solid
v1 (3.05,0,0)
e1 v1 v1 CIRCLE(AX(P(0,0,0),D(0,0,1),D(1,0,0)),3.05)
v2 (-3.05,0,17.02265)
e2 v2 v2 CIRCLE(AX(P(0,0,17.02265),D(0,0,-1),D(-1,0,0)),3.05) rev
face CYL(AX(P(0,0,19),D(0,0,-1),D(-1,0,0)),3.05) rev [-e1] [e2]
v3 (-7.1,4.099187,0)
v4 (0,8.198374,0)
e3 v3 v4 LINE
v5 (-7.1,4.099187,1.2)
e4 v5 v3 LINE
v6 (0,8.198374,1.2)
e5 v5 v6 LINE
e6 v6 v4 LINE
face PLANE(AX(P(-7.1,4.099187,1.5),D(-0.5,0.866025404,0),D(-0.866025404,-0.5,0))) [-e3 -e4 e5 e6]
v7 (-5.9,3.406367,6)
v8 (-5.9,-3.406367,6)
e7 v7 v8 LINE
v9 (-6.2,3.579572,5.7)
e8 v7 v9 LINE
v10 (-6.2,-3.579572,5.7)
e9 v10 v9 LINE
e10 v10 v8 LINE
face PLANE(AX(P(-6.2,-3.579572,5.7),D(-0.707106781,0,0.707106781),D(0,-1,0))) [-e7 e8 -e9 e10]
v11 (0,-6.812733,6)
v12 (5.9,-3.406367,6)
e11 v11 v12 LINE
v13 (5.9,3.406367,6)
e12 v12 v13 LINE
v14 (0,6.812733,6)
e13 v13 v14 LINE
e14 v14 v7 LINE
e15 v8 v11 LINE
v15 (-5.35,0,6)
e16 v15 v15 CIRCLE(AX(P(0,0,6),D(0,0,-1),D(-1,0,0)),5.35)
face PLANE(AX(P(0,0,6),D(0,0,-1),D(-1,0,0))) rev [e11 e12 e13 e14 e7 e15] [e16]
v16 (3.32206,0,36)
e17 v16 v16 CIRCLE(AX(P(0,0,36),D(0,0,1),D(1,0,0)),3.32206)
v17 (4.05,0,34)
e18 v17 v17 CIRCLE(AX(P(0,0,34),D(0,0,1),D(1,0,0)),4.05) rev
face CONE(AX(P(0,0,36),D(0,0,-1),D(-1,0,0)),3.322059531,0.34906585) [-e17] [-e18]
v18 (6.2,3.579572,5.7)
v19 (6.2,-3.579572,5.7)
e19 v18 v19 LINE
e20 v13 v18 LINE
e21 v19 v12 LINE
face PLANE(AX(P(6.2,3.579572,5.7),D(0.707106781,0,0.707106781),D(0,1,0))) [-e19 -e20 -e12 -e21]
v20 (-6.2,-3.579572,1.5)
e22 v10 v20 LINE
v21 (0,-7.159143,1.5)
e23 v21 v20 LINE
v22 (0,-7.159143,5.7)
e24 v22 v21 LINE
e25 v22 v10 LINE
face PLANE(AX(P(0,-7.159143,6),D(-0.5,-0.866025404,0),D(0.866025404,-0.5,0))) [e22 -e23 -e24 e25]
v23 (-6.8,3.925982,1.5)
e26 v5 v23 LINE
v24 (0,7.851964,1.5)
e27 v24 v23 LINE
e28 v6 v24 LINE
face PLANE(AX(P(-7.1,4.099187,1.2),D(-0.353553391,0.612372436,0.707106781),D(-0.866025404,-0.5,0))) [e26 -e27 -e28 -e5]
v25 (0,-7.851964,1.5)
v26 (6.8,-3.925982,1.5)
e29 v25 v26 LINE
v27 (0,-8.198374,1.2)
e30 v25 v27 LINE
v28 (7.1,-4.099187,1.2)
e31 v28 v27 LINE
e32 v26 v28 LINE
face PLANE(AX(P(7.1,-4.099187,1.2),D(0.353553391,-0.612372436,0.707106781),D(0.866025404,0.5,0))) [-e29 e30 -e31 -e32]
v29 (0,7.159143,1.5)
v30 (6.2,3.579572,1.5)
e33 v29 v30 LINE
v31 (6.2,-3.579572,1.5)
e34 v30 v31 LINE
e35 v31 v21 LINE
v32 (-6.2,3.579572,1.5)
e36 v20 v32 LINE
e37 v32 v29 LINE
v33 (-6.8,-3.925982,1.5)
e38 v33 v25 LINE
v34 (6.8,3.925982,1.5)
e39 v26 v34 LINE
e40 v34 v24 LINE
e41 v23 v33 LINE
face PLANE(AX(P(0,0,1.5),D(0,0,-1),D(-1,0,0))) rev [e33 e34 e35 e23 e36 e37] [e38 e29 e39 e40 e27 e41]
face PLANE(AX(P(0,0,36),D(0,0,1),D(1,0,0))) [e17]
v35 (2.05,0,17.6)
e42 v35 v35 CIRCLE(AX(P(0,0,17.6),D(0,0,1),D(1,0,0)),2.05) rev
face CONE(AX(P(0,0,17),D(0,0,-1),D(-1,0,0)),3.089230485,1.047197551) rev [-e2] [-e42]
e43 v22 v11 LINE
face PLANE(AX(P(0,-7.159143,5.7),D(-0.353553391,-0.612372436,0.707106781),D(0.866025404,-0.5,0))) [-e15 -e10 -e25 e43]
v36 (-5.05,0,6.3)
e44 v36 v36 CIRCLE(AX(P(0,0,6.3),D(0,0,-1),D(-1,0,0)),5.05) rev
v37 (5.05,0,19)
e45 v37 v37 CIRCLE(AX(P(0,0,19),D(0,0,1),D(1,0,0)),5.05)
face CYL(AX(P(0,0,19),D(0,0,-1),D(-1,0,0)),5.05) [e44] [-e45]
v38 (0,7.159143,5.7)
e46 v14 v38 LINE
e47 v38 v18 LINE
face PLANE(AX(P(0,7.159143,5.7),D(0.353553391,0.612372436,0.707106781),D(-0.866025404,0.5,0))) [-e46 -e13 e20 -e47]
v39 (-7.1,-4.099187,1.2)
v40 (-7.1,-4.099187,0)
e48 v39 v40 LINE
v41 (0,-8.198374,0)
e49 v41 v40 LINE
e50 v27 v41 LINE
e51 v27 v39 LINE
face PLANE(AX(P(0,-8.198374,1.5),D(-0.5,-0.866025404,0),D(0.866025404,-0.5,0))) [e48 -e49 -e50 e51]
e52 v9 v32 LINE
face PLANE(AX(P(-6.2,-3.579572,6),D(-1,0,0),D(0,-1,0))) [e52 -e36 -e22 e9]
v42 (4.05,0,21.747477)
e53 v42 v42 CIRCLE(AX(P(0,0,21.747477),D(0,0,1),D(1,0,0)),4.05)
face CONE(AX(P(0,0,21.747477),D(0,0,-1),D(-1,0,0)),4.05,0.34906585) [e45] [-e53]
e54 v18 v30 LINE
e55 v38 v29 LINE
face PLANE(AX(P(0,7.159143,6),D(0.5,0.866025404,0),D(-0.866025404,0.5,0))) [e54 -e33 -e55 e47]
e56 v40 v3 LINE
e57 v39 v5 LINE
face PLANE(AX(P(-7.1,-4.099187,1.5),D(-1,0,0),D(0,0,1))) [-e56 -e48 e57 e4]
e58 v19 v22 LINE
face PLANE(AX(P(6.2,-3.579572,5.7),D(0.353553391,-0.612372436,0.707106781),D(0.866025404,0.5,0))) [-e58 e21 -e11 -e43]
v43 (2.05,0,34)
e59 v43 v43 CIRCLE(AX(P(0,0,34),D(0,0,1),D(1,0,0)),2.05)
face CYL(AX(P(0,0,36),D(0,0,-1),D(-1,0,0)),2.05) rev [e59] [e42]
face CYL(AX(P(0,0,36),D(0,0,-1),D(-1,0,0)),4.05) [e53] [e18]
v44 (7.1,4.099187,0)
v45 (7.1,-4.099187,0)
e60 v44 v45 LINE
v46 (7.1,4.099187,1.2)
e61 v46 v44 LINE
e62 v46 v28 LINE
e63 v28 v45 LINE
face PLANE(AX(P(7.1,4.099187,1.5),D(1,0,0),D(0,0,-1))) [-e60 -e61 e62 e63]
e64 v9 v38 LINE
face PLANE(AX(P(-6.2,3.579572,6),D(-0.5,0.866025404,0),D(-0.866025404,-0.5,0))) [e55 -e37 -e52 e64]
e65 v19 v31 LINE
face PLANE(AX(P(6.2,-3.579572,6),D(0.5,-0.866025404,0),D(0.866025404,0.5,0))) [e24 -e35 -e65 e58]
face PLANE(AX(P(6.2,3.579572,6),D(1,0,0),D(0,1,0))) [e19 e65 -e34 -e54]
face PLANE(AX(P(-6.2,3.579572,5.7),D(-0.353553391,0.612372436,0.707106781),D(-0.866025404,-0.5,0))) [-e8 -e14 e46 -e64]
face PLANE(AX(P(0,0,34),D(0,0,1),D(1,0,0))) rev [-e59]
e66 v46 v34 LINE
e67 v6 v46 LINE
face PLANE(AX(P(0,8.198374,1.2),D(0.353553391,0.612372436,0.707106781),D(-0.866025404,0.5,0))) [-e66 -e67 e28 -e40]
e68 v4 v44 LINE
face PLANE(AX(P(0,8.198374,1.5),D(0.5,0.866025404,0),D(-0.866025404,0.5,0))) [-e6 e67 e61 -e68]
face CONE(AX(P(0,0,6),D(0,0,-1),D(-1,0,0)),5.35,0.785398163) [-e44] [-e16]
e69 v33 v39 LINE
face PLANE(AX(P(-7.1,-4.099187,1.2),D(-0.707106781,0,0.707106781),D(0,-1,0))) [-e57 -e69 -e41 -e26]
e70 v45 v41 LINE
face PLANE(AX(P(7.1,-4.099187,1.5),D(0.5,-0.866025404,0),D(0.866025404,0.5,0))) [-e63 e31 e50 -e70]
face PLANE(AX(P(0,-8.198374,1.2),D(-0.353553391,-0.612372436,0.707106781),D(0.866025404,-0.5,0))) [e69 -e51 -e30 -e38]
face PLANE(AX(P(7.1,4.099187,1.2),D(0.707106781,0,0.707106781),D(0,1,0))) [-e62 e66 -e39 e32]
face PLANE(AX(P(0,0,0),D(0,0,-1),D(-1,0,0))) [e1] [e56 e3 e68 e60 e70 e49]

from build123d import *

# Parameters (mm, degrees)
BOSS_EXTRUDE1_DEPTH = 1.5
SKETCH1_8_R         = 4.05
BOSS_EXTRUDE3_DEPTH = 36
SKETCH1_9_R         = 5.05
BOSS_EXTRUDE4_DEPTH = 19
SHELL1_START        = 2
SHELL1_OUTLINE_R    = 3.05
SHELL1_DEPTH        = 15
SHELL1_START_2      = 17
SHELL1_2_OUTLINE_R  = 2.05
SHELL1_2_DEPTH      = 17
SKETCH1_10_R        = 3.05
CUT_EXTRUDE1_DEPTH  = 11
SKETCH1_3_R         = 3.05
BOSS_EXTRUDE2_DEPTH = 6
CHAMFER1_SIZE       = 2
CHAMFER1_SIZE2      = 0.727940469
CHAMFER2_SIZE       = 2.747477419
CHAMFER2_SIZE_2     = 1
CHAMFER3_SIZE       = 1.039230485
CHAMFER3_SIZE_2     = 0.6
CHAMFER5_SIZE       = 0.3


# Read off the part's stored shape, not the designer's step: Shell1
with BuildPart() as part:
    # Sketch1 → Boss-Extrude1 (new body)
    with BuildSketch(Plane.XY):
        Polygon((-7.1, 4.099186911), (0, 8.198373822), (7.1, 4.099186911), (7.1, -4.099186911), (0, -8.198373822), (-7.1, -4.099186911), align=None)
    extrude(amount=BOSS_EXTRUDE1_DEPTH)

    # Sketch1<8> → Boss-Extrude3 (add)
    with BuildSketch(Plane.XY):
        with Locations(Location((0, 0, 0), (0, 0, 180))):
            Circle(SKETCH1_8_R)
    extrude(amount=BOSS_EXTRUDE3_DEPTH)

    # Sketch1<9> → Boss-Extrude4 (add)
    with BuildSketch(Plane.XY):
        with Locations(Location((0, 0, 0), (0, 0, 180))):
            Circle(SKETCH1_9_R)
    extrude(amount=BOSS_EXTRUDE4_DEPTH)

    # Shell1 outline → Shell1 (cut)
    with BuildSketch(Plane.XY.offset(SHELL1_START)):
        Circle(SHELL1_OUTLINE_R)
    extrude(amount=SHELL1_DEPTH, mode=Mode.SUBTRACT)

    # Shell1 2 outline → Shell1 2 (cut)
    with BuildSketch(Plane.XY.offset(SHELL1_START_2)):
        Circle(SHELL1_2_OUTLINE_R)
    extrude(amount=SHELL1_2_DEPTH, mode=Mode.SUBTRACT)

    # Sketch1<10> → Cut-Extrude1 (cut)
    with BuildSketch(Plane.XY):
        Circle(SKETCH1_10_R)
    extrude(amount=CUT_EXTRUDE1_DEPTH, mode=Mode.SUBTRACT)

    # Sketch1<3> → Boss-Extrude2 (add)
    with BuildSketch(Plane.XY):
        Polygon((0, 7.159143338), (6.2, 3.579571669), (6.2, -3.579571669), (0, -7.159143338), (-6.2, -3.579571669), (-6.2, 3.579571669), align=None)
        Circle(SKETCH1_3_R, mode=Mode.SUBTRACT)
    extrude(amount=BOSS_EXTRUDE2_DEPTH)

    # Chamfer1
    chamfer1_edges = [part.edges().sort_by_distance(p)[0] for p in [
        (4.05, 0, 36),
    ]]
    chamfer1_side = [part.faces().sort_by_distance(p)[0] for p in [
        (4.05, 0, 27.5),
    ]]
    chamfer(chamfer1_edges, length=CHAMFER1_SIZE, length2=CHAMFER1_SIZE2, reference=chamfer1_side[0])

    # Chamfer2
    # the kernel refuses this chamfer: 2.747477419, 1 mm, written as the material it adds along each edge
    with BuildSketch(Plane(origin=(0, 0, 19), x_dir=(-1, 0, 0), z_dir=(0, -1, 0))) as chamfer2_piece_1_section:
        Polygon((4.05, -CHAMFER2_SIZE), (4.05 + CHAMFER2_SIZE_2, 0), (4.05, 0), align=None)
    chamfer2_piece_1 = revolve(axis=Axis((0, 0, 19), (0, 0, -1)), mode=Mode.PRIVATE)
    chamfer2_piece_1 = chamfer2_piece_1 & Plane(origin=(0, 0, 20.413276919), x_dir=(-1, 0, 0), z_dir=(0, 0, -1)) * Cylinder(5.05, 21, mode=Mode.PRIVATE)
    add(chamfer2_piece_1)

    # Chamfer3
    # the kernel refuses this chamfer: 1.039230485, 0.6 mm, written as the material it takes off along each edge
    with BuildSketch(Plane(origin=(0, 0, 17), x_dir=(1, 0, 0), z_dir=(0, -1, 0))) as chamfer3_piece_1_section:
        Polygon((2.05 + CHAMFER3_SIZE, 0), (2.05, CHAMFER3_SIZE_2), (2.05, 0), align=None)
    chamfer3_piece_1 = revolve(axis=Axis((0, 0, 17), (0, 0, 1)), mode=Mode.PRIVATE)
    chamfer3_piece_1 = chamfer3_piece_1 & Plane(origin=(0, 0, 17.306641595), x_dir=(1, 0, 0), z_dir=(0, 0, -1)) * Cylinder(3.05, 13, mode=Mode.PRIVATE)
    add(chamfer3_piece_1, mode=Mode.SUBTRACT)

    # Chamfer5
    chamfer5_edges = [part.edges().sort_by_distance(p)[0] for p in [
        (3.55, 6.148780367, 1.5),
        (7.1, 0, 1.5),
        (3.55, -6.148780367, 1.5),
        (-3.55, -6.148780367, 1.5),
        (5.05, 0, 6),
        (-7.1, 0, 1.5),
        (-3.1, -5.369357503, 6),
        (3.1, -5.369357503, 6),
        (6.2, 0, 6),
        (3.1, 5.369357503, 6),
        (-3.1, 5.369357503, 6),
        (-6.2, 0, 6),
        (-3.55, 6.148780367, 1.5),
    ]]
    chamfer(chamfer5_edges, length=CHAMFER5_SIZE)


solid = part.part
